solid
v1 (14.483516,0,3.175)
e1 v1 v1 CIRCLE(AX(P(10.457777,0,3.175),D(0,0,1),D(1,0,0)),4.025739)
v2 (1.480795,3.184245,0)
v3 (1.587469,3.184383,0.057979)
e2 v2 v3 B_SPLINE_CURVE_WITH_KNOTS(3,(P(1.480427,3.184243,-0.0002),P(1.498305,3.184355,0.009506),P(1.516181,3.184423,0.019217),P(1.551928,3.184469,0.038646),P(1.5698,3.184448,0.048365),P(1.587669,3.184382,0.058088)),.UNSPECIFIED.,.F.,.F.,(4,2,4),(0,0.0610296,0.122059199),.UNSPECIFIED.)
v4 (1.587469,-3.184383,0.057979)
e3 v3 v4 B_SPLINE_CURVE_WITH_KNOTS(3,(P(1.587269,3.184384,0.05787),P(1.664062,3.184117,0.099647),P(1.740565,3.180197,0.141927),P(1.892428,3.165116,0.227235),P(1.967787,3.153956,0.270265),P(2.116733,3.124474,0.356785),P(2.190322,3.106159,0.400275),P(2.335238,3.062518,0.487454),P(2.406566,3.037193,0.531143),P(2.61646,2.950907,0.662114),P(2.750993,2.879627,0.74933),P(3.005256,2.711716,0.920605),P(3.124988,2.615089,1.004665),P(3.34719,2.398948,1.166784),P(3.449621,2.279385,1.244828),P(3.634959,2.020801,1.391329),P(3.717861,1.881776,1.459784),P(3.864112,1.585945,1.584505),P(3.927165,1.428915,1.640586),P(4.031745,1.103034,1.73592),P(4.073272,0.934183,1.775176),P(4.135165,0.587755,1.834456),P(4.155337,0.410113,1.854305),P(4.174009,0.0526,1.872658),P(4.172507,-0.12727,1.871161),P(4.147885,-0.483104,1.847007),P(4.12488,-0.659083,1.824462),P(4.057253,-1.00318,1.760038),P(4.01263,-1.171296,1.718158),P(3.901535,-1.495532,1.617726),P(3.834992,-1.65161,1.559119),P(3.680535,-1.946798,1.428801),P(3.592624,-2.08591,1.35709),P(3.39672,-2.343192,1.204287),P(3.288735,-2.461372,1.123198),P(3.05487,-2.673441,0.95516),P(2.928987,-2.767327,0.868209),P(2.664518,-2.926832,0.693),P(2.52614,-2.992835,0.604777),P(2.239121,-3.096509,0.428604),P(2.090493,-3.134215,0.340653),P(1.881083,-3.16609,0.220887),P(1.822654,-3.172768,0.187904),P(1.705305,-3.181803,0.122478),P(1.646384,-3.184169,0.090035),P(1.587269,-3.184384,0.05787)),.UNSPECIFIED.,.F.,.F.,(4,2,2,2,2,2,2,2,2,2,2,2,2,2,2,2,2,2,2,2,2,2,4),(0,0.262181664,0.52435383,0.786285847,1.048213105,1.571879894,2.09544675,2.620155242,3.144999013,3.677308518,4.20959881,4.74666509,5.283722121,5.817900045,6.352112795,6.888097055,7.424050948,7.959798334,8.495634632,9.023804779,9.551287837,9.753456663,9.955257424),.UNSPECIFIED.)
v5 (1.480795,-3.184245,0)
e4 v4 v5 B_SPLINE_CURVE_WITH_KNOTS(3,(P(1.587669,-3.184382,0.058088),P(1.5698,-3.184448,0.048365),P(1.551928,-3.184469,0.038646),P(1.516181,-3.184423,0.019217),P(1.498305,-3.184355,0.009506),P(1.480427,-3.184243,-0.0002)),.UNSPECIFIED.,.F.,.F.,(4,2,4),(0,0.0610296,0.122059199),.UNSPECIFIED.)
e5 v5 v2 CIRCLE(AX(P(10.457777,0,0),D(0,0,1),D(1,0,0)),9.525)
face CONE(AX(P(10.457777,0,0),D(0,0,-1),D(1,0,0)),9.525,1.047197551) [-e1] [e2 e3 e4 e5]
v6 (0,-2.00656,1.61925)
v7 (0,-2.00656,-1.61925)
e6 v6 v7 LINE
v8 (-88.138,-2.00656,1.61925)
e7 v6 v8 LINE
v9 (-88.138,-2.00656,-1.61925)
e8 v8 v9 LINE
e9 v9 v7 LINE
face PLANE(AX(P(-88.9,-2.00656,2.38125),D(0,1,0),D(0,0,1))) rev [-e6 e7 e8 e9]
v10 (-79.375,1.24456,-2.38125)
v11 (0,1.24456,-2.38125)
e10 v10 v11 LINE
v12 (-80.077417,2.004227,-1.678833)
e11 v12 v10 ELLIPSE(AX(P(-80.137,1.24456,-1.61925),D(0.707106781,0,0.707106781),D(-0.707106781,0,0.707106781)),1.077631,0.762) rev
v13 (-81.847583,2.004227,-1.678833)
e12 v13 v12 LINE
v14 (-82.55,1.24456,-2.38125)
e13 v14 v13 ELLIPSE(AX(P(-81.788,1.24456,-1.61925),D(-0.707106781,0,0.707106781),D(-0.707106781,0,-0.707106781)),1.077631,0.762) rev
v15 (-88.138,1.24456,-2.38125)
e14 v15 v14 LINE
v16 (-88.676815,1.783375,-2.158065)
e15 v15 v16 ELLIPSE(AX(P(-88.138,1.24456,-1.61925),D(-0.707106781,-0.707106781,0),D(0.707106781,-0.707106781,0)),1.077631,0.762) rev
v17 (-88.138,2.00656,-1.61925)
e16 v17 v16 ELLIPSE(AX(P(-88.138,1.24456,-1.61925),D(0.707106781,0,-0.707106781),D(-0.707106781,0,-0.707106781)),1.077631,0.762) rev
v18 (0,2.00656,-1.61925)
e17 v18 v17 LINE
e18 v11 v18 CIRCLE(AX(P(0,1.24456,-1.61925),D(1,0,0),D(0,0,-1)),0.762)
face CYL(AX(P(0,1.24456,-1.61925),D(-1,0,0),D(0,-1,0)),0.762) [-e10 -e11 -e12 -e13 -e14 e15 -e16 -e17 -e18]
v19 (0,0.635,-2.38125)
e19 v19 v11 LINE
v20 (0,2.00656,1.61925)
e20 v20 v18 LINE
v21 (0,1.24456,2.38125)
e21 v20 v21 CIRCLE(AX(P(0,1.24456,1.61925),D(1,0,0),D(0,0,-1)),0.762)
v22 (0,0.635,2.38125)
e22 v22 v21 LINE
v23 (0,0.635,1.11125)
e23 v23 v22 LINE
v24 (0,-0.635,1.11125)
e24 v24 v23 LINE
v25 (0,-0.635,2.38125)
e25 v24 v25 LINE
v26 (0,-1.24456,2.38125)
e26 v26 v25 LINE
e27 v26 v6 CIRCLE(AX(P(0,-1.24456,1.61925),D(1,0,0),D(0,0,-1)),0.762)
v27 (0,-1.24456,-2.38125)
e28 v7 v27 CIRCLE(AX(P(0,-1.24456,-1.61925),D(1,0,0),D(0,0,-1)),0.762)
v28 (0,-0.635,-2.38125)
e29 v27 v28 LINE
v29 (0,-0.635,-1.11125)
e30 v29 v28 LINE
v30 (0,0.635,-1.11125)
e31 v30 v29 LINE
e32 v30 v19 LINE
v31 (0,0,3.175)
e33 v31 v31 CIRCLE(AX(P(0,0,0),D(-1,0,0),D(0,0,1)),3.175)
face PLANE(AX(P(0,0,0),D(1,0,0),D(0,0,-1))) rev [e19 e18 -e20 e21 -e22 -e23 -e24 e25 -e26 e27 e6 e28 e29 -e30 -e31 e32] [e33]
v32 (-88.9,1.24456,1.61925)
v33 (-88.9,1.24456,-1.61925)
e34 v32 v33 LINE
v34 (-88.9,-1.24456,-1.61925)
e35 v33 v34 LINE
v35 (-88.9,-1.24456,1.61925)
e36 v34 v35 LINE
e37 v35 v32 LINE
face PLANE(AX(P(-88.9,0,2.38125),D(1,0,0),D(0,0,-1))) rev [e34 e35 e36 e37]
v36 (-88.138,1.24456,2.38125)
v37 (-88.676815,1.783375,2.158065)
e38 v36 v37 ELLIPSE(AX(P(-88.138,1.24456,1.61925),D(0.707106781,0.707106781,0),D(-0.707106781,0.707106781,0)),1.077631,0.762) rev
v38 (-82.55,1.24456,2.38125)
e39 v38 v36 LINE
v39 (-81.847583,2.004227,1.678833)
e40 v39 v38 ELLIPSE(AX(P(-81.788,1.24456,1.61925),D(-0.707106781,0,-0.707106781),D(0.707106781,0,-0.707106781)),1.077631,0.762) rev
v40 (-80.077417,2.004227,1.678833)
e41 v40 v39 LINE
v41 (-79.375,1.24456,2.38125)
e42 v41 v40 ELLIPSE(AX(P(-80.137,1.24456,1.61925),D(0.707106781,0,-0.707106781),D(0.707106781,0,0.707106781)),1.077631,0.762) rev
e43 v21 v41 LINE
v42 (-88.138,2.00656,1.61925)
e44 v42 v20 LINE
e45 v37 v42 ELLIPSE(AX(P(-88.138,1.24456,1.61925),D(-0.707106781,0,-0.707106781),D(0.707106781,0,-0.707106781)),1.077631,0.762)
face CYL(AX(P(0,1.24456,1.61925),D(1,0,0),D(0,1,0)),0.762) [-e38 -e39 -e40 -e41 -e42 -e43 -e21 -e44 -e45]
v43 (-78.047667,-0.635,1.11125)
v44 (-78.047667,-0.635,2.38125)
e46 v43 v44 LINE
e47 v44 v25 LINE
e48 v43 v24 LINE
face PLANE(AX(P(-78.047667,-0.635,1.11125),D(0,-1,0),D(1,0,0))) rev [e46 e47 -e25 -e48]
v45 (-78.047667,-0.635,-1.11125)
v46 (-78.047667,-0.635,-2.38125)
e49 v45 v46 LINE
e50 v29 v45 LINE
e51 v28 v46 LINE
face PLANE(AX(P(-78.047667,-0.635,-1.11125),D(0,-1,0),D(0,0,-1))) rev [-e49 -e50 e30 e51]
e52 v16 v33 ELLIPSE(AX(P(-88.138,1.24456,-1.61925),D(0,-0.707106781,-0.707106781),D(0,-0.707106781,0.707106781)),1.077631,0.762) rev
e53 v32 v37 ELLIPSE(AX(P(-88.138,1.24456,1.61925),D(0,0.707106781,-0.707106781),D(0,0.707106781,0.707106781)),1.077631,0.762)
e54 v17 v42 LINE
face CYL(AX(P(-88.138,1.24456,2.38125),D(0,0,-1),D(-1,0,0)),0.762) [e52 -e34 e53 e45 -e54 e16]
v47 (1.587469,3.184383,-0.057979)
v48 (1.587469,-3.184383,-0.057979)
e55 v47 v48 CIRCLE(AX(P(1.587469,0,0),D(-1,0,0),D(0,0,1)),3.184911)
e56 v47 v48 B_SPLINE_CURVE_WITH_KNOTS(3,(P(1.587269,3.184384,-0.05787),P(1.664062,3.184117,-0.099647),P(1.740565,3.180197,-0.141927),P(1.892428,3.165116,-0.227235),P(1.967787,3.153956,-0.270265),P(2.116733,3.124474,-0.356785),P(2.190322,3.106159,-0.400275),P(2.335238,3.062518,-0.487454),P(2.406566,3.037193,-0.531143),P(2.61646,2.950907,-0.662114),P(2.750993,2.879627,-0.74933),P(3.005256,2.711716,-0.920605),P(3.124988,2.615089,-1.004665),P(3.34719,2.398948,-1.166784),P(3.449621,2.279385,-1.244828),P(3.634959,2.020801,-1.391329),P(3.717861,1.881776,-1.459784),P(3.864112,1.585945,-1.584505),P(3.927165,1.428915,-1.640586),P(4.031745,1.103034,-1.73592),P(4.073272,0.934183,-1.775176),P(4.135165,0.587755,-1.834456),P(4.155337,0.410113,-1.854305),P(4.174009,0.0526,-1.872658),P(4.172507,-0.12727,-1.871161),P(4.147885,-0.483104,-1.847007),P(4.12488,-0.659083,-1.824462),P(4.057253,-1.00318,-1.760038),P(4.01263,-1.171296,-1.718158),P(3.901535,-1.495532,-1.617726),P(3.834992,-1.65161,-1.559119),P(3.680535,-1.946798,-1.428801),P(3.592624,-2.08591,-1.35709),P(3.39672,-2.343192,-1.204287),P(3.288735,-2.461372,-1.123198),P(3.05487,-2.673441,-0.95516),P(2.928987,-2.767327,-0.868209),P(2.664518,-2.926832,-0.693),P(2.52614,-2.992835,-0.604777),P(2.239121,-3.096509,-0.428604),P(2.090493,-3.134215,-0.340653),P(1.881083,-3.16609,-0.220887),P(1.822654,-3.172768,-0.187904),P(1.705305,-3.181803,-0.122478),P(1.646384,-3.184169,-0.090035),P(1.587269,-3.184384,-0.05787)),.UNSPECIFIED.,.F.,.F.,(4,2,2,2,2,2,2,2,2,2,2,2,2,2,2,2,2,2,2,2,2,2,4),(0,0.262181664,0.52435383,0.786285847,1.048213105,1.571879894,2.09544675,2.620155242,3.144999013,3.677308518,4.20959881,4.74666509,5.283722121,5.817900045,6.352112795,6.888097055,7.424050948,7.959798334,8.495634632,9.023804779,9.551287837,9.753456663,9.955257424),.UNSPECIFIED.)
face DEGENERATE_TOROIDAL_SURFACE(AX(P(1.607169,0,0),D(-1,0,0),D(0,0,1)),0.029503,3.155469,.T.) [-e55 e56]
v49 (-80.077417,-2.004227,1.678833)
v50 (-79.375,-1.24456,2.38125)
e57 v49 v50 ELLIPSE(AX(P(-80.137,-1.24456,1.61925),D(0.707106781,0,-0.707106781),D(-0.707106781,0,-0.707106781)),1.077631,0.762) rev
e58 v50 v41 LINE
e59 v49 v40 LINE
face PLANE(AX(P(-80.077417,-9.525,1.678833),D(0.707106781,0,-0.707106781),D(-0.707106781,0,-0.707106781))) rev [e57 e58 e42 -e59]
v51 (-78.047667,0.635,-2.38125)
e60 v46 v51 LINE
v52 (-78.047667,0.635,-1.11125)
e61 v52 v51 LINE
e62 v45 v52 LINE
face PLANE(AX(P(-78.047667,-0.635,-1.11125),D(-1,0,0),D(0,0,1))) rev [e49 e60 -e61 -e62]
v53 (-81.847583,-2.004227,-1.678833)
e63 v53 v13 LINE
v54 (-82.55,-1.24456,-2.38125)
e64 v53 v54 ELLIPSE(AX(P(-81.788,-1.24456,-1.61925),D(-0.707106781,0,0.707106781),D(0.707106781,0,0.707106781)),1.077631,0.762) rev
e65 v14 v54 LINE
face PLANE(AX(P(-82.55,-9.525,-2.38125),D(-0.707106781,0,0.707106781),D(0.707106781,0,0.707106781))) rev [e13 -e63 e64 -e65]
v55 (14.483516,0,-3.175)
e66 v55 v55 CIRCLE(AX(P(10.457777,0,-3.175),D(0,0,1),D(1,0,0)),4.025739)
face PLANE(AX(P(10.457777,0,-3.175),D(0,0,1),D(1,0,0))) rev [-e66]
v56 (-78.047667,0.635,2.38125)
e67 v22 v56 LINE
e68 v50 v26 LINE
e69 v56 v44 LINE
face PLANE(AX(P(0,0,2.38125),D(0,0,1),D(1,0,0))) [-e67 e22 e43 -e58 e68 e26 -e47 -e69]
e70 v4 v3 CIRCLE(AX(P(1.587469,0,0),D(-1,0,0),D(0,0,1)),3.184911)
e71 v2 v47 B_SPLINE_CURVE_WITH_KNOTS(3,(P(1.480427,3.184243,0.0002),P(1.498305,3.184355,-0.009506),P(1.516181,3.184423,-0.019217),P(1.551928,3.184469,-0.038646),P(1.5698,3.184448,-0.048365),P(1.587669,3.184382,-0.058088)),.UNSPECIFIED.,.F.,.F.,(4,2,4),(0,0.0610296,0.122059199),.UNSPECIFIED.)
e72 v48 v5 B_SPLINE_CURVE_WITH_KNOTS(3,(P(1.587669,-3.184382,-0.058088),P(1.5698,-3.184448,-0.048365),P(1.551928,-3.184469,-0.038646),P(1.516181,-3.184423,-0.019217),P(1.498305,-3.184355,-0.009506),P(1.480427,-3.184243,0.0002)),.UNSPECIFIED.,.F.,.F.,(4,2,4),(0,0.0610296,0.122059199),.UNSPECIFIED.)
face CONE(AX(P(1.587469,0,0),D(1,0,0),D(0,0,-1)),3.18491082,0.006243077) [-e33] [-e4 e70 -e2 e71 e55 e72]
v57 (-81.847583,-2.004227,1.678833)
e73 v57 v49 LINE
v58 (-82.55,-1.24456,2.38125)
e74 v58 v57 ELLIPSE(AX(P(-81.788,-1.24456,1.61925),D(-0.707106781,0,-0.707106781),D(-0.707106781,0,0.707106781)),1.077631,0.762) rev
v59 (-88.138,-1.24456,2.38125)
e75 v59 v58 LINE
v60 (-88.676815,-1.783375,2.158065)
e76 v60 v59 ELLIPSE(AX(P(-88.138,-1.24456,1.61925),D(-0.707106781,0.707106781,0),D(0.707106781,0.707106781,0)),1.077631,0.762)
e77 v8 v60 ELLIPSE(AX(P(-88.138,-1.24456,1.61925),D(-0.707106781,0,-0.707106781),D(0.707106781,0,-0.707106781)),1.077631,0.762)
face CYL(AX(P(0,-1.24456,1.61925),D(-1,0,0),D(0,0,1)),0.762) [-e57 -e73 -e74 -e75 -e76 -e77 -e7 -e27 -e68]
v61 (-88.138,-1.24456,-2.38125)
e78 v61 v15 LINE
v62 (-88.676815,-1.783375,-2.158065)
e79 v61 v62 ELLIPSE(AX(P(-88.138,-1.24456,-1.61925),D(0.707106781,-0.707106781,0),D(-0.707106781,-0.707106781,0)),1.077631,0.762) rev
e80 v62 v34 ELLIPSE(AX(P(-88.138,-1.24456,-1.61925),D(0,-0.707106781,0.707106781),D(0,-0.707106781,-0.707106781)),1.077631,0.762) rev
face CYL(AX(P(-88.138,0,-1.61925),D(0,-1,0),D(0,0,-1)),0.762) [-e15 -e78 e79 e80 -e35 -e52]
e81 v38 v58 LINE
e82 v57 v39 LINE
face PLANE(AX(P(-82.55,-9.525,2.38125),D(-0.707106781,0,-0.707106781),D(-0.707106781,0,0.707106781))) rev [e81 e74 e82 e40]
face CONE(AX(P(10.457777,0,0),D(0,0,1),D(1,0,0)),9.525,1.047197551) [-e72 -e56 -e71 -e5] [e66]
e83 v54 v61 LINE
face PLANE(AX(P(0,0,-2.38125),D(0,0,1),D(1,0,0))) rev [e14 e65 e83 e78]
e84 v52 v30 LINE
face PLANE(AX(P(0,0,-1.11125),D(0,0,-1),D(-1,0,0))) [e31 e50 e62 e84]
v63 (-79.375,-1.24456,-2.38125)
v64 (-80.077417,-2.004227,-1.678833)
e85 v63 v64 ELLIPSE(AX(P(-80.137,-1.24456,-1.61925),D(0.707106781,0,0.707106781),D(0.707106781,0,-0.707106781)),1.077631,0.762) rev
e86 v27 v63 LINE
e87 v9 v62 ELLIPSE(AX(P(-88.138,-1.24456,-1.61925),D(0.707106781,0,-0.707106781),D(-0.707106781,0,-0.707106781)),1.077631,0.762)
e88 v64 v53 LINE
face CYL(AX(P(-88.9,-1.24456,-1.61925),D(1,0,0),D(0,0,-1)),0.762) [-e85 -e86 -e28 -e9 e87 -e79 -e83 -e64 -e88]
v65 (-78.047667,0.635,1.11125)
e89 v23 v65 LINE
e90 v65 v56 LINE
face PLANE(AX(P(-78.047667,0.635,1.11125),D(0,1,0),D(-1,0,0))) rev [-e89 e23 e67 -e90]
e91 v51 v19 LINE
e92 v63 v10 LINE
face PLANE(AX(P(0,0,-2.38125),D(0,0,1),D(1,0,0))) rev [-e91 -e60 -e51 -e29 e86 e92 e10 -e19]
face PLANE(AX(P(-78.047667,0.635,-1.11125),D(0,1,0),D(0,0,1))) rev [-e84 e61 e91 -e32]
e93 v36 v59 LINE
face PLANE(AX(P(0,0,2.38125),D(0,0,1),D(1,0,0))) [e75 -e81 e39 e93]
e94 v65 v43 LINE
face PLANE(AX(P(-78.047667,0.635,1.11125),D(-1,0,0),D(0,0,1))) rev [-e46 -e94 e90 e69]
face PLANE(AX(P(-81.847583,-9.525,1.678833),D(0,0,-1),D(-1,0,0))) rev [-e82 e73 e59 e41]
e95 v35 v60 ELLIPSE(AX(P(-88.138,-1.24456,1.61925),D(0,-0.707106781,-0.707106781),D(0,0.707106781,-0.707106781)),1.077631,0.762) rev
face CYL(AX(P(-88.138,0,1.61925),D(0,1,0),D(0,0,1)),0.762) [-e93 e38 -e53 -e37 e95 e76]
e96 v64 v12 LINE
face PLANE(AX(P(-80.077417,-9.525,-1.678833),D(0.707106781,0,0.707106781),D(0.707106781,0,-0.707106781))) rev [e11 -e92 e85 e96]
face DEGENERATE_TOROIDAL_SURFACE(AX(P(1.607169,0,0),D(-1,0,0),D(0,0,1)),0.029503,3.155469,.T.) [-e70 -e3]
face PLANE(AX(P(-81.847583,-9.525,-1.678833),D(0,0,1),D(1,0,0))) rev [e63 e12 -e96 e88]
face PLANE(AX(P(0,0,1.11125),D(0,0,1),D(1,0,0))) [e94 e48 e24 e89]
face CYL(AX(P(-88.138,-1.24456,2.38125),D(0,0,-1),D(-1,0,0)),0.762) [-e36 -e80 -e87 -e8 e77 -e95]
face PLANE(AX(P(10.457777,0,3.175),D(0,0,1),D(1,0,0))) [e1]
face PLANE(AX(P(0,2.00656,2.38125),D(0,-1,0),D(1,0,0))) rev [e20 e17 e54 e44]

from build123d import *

# Parameters (mm, degrees)
SKETCH2_R                     = 9.525
BOSS_EXTRUDE1_DEPTH           = 3.175
BOSS_EXTRUDE1_TAPER           = 60
BOSS_EXTRUDE1_OTHER_WAY_DEPTH = 3.175
BOSS_EXTRUDE1_OTHER_WAY_TAPER = 60
BOSS_EXTRUDE2_DEPTH           = 2.38125
CUT_EXTRUDE1_DEPTH            = 90.465522276
CUT_EXTRUDE1_DEPTH_BACK       = 90.465522276
SKETCH5_W                     = 78.047666622
SKETCH5_H                     = 1.27
CUT_EXTRUDE2_DEPTH            = 1.27
SKETCH6_W                     = 78.047666622
SKETCH6_H                     = 1.27
CUT_EXTRUDE3_DEPTH            = 1.27
FILLET1_START                 = -88.9
FILLET1_DEPTH                 = 88.9
FILLET1_START_2               = -2.38125
FILLET1_2_DEPTH               = 4.7625
FILLET1_START_3               = -2.006559914
FILLET1_3_DEPTH               = 4.013119828


with BuildPart() as part:
    # Sketch1 → Revolve1 (revolve)
    with BuildSketch(Plane.XY, mode=Mode.PRIVATE) as revolve1_sk:
        with BuildLine():
            Line((0, 0), (0, 3.175))
            Line((0, 3.175), (1.587469063, 3.18491082))
            ThreePointArc((1.587469063, 3.18491082), (3.841885865, 2.257287955), (4.7625, 0))
            Line((4.7625, 0), (3.175, 0))
            Line((3.175, 0), (0, 0))
        make_face()
    revolve(revolve1_sk.sketch.rotate(Axis((-88.99, 0, 0), (1, 0, 0)), 90), axis=Axis((-88.99, 0, 0), (1, 0, 0)))

    # Sketch2 → Boss-Extrude1 (add)
    with BuildSketch(Plane.XY):
        with Locations((10.457777384, 0)):
            Circle(SKETCH2_R)
    extrude(amount=BOSS_EXTRUDE1_DEPTH, taper=BOSS_EXTRUDE1_TAPER)

    # Sketch2 → Boss-Extrude1 other way (add)
    with BuildSketch(Plane.XY):
        with Locations((10.457777384, 0)):
            Circle(SKETCH2_R)
    extrude(amount=-BOSS_EXTRUDE1_OTHER_WAY_DEPTH, taper=BOSS_EXTRUDE1_OTHER_WAY_TAPER)

    # Sketch3 → Boss-Extrude2 (add, symmetric)
    with BuildSketch(Plane.XY):
        Polygon((0, 2.006559914), (-88.9, 2.006559914), (-88.9, 0), (-88.9, -2.006559914), (0, -2.006559914), (0, 0), align=None)
    extrude(amount=BOSS_EXTRUDE2_DEPTH, both=True)

    # Sketch4 → Cut-Extrude1 (cut, two sides: drawn at the far end of the back side and taken through both)
    with BuildSketch(Plane(origin=(0, 0, 0), x_dir=(1, 0, 0), z_dir=(0, 1, 0)).offset(-CUT_EXTRUDE1_DEPTH_BACK)):
        Polygon((-82.55, 2.38125), (-81.847582607, 1.678832607), (-80.077417393, 1.678832607), (-79.375, 2.38125), align=None)
        Polygon((-80.077417393, -1.678832607), (-79.375, -2.38125), (-82.55, -2.38125), (-81.847582607, -1.678832607), align=None)
    extrude(amount=CUT_EXTRUDE1_DEPTH + CUT_EXTRUDE1_DEPTH_BACK, mode=Mode.SUBTRACT)

    # Sketch5 → Cut-Extrude2 (cut)
    with BuildSketch(Plane.XY.offset(2.38125)):
        with Locations((-39.023833311, 0)):
            Rectangle(SKETCH5_W, SKETCH5_H)
    extrude(amount=-CUT_EXTRUDE2_DEPTH, mode=Mode.SUBTRACT)

    # Sketch6 → Cut-Extrude3 (cut)
    with BuildSketch(Plane(origin=(0, 0, -2.38125), x_dir=(-1, 0, 0), z_dir=(0, 0, -1))):
        with Locations((39.023833311, 0)):
            Rectangle(SKETCH6_W, SKETCH6_H)
    extrude(amount=-CUT_EXTRUDE3_DEPTH, mode=Mode.SUBTRACT)

    # Fillet1: read off the stored shape, not the designer's step
    # Fillet1 outline → Fillet1 (cut)
    with BuildSketch(Plane.YZ.offset(FILLET1_START)):
        with BuildLine():
            Line((-2.006559914, 2.38125), (-2.006559914, 1.61925))
            ThreePointArc((-2.006559914, 1.61925), (-1.783375281, 2.158065367), (-1.244559914, 2.38125))
            Line((-1.244559914, 2.38125), (-2.006559914, 2.38125))
        make_face()
        with BuildLine():
            ThreePointArc((-1.244559914, -2.38125), (-1.783375281, -2.158065367), (-2.006559914, -1.61925))
            Line((-2.006559914, -1.61925), (-2.006559914, -2.38125))
            Line((-2.006559914, -2.38125), (-1.244559914, -2.38125))
        make_face()
        with BuildLine():
            Line((2.006559914, 2.38125), (1.244559914, 2.38125))
            ThreePointArc((1.244559914, 2.38125), (1.783375281, 2.158065367), (2.006559914, 1.61925))
            Line((2.006559914, 1.61925), (2.006559914, 2.38125))
        make_face()
        with BuildLine():
            ThreePointArc((2.006559914, -1.61925), (1.783375281, -2.158065367), (1.244559914, -2.38125))
            Line((1.244559914, -2.38125), (2.006559914, -2.38125))
            Line((2.006559914, -2.38125), (2.006559914, -1.61925))
        make_face()
    extrude(amount=FILLET1_DEPTH, mode=Mode.SUBTRACT)

    # Fillet1 2 outline → Fillet1 2 (cut)
    with BuildSketch(Plane.XY.offset(FILLET1_START_2)):
        with BuildLine():
            Line((-88.9, -2.006559914), (-88.138, -2.006559914))
            ThreePointArc((-88.138, -2.006559914), (-88.676815367, -1.783375281), (-88.9, -1.244559914))
            Line((-88.9, -1.244559914), (-88.9, -2.006559914))
        make_face()
        with BuildLine():
            Line((-88.9, 2.006559914), (-88.9, 1.244559914))
            ThreePointArc((-88.9, 1.244559914), (-88.676815367, 1.783375281), (-88.138, 2.006559914))
            Line((-88.138, 2.006559914), (-88.9, 2.006559914))
        make_face()
    extrude(amount=FILLET1_2_DEPTH, mode=Mode.SUBTRACT)

    # Fillet1 3 outline → Fillet1 3 (cut)
    with BuildSketch(Plane(origin=(0, 0, 0), x_dir=(1, 0, 0), z_dir=(0, 1, 0)).offset(FILLET1_START_3)):
        with BuildLine():
            ThreePointArc((-88.138, -2.38125), (-88.676815367, -2.158065367), (-88.9, -1.61925))
            Line((-88.9, -1.61925), (-88.9, -2.38125))
            Line((-88.9, -2.38125), (-88.138, -2.38125))
        make_face()
        with BuildLine():
            Line((-88.9, 2.38125), (-88.9, 1.61925))
            ThreePointArc((-88.9, 1.61925), (-88.676815367, 2.158065367), (-88.138, 2.38125))
            Line((-88.138, 2.38125), (-88.9, 2.38125))
        make_face()
    extrude(amount=FILLET1_3_DEPTH, mode=Mode.SUBTRACT)


solid = part.part
